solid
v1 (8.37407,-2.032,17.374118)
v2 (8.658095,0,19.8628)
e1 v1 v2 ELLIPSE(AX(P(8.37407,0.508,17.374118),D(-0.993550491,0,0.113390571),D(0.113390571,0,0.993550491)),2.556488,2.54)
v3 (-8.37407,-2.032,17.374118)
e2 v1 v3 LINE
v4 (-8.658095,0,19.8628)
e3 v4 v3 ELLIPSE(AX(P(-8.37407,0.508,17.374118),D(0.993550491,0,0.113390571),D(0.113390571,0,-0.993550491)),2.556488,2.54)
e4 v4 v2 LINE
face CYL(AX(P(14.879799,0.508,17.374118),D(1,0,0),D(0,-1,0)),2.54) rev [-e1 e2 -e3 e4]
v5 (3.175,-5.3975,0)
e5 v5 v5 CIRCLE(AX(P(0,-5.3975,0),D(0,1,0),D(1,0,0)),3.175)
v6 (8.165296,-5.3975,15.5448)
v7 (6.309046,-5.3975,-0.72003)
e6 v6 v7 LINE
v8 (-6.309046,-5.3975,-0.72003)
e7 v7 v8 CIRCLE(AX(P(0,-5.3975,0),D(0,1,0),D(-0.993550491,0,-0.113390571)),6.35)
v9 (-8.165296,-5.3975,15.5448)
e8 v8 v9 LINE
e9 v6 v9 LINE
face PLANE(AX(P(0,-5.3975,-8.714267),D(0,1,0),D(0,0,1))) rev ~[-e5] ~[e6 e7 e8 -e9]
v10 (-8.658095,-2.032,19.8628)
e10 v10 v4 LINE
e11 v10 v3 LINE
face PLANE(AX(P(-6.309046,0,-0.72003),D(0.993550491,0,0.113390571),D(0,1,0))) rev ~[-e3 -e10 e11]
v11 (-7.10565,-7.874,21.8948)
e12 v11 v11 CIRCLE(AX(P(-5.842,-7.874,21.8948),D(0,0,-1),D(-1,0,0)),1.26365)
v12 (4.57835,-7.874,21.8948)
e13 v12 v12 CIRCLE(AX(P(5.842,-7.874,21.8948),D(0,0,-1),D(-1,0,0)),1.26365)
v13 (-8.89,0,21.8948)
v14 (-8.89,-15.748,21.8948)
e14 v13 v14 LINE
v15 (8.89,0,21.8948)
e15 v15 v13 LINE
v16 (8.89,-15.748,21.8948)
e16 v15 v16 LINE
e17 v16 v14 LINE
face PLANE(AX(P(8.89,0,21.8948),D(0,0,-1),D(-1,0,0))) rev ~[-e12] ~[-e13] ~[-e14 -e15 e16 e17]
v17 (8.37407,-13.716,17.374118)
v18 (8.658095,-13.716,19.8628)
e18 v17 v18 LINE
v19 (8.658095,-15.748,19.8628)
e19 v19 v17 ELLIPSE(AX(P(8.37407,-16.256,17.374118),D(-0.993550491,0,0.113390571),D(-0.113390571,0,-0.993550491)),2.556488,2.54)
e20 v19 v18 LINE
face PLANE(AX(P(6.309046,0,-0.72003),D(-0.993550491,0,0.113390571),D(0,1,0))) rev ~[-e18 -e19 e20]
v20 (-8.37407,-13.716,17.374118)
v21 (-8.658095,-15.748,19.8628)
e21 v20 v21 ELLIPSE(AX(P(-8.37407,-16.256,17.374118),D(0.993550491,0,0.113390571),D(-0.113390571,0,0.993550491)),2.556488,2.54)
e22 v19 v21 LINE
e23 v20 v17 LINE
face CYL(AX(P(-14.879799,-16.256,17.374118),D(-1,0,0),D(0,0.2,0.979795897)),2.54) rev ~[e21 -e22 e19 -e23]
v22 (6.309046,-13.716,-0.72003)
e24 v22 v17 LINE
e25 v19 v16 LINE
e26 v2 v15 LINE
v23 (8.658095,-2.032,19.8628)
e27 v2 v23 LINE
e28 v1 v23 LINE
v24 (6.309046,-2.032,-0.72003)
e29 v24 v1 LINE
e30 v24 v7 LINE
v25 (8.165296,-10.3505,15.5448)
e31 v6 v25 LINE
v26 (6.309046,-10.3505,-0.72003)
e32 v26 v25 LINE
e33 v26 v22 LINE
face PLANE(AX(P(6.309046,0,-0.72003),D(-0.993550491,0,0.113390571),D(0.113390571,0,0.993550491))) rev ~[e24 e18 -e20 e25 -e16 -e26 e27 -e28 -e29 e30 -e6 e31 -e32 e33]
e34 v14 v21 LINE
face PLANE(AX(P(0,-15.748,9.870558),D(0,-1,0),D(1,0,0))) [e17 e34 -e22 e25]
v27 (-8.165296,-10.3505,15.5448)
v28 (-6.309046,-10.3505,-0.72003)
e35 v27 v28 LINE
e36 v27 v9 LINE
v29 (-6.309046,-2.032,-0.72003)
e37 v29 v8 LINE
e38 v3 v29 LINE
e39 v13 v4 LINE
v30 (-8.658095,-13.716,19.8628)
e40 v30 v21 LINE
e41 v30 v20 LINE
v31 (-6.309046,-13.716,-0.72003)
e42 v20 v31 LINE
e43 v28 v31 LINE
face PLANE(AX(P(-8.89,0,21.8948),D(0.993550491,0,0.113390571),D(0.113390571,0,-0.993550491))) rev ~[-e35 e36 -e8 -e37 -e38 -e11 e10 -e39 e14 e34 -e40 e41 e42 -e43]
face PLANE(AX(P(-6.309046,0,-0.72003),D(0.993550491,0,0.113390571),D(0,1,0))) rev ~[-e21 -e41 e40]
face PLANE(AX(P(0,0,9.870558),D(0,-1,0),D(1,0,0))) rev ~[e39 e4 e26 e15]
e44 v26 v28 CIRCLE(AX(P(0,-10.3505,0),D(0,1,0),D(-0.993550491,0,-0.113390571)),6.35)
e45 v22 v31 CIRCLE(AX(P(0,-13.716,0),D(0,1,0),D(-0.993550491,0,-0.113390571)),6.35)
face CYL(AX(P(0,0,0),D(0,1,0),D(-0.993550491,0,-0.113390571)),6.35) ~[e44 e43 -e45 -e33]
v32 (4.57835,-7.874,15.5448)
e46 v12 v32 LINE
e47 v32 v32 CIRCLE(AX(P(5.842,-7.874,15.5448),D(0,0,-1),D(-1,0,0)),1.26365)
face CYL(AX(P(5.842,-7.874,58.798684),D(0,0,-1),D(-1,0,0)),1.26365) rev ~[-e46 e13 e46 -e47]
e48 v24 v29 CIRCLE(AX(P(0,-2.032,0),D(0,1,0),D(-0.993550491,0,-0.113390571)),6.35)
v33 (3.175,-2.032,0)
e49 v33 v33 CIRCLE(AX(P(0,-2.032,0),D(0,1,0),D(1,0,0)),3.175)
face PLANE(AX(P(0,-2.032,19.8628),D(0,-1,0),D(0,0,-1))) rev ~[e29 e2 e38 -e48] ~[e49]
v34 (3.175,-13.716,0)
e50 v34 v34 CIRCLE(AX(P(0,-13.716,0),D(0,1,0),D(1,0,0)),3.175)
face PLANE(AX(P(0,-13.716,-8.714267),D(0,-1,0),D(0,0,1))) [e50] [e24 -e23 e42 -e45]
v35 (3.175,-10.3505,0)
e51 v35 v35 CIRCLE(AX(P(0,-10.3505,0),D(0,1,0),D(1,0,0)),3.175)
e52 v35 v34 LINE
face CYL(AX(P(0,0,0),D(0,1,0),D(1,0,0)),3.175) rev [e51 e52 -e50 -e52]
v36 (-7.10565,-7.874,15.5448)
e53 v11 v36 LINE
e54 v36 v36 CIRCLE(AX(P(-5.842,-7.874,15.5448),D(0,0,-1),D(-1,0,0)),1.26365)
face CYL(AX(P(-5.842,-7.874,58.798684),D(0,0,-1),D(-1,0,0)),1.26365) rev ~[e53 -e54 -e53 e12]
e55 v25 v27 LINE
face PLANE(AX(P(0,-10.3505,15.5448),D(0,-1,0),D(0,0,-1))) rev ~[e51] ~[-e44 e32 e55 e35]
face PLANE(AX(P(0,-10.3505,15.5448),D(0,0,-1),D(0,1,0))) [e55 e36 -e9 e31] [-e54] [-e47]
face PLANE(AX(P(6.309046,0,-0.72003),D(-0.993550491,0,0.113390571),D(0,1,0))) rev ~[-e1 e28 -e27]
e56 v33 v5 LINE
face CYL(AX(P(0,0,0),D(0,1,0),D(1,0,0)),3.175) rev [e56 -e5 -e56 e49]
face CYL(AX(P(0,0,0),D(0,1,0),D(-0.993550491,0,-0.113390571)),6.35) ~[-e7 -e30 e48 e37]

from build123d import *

# Parameters (mm, degrees)
F0_R         = 3.175
F1_DEPTH     = 15.748
F2_W         = 4.953
F2_H         = 16.2648302115
F2_H_2       = 7.994236929
F3_DEPTH     = 12.7
F2_W_2       = 2.032
F2_H_3       = 20.5828301237
F4_DEPTH     = 12.7
F5_T4_DEPTH  = 29.7595972634
F5_T10_DEPTH = 29.7595972634
F7_D         = 2.5273


# Not quite as in the source:
# - a fillet or chamfer that OpenCascade refuses, or shapes differently, is made with other operations: its cross-section is extruded or revolved along the edge and cut away or added


with BuildPart() as f1:
    # F0 (on Front) → F1 (new body)
    with BuildSketch(Plane.XZ):
        with BuildLine():
            Line((-8.89, 21.8948), (-6.3090456189, -0.7200301237))
            ThreePointArc((-6.3090456189, -0.7200301237), (0, -6.35), (6.3090456189, -0.7200301237))
            Line((6.3090456189, -0.7200301237), (8.89, 21.8948))
            Line((8.89, 21.8948), (-8.89, 21.8948))
        make_face()
        Circle(F0_R, mode=Mode.SUBTRACT)
    extrude(amount=F1_DEPTH)

    # F2 (on Right) → F3 (cut, symmetric)
    with BuildSketch(Plane.YZ):
        with Locations((-7.874, 7.4123849821)):
            Rectangle(F2_W, F2_H)
        with Locations((-7.874, -4.7171485882)):
            Rectangle(F2_W, F2_H_2)
    extrude(amount=F3_DEPTH, both=True, mode=Mode.SUBTRACT)

    # F2 (on Right) → F4 (cut, symmetric)
    with BuildSketch(Plane.YZ):
        with Locations((-14.732, -4.7171485882)):
            Rectangle(F2_W_2, F2_H_2)
        with Locations((-1.016, -4.7171485882)):
            Rectangle(F2_W_2, F2_H_2)
        with Locations((-1.016, 9.5713849382)):
            Rectangle(F2_W_2, F2_H_3)
        with Locations((-14.732, 9.5713849382)):
            Rectangle(F2_W_2, F2_H_3)
    extrude(amount=F4_DEPTH, both=True, mode=Mode.SUBTRACT)

    # F5: fillet of radius 2.54 on 2 edges, made by hand


with BuildPart() as f5_tool2:
    # F5_s3 → F5_t4 (new body)
    with BuildSketch(Plane.YZ.offset(-14.8797986317)):
        with BuildLine():
            ThreePointArc((-15.748, 19.8628), (-14.2885244601, 18.9805554727), (-13.716, 17.3741184213))
            Line((-13.716, 17.3741184213), (-13.716, 19.8628))
            Line((-13.716, 19.8628), (-15.748, 19.8628))
        make_face()
    extrude(amount=F5_T4_DEPTH)

    split(bisect_by=Plane(origin=(6.3090456189, 0, -0.7200301237), x_dir=(0, 1, 0), z_dir=(-0.9935504912, 0, 0.1133905707)), keep=Keep.TOP)

    split(bisect_by=Plane(origin=(-6.3090456189, 0, -0.7200301237), x_dir=(0, 1, 0), z_dir=(0.9935504912, 0, 0.1133905707)), keep=Keep.TOP)


with BuildPart() as f1_1:
    add(f1.part)

    # F5_t1: union F5_tool2
    add(f5_tool2.part)


with BuildPart() as f5_tool8:
    # F5_s9 → F5_t10 (new body)
    with BuildSketch(Plane.YZ.offset(14.8797986317)):
        with BuildLine():
            ThreePointArc((-2.032, 17.3741184213), (-1.4594755399, 18.9805554727), (0, 19.8628))
            Line((0, 19.8628), (-2.032, 19.8628))
            Line((-2.032, 19.8628), (-2.032, 17.3741184213))
        make_face()
    extrude(amount=-F5_T10_DEPTH)

    split(bisect_by=Plane(origin=(6.3090456189, 0, -0.7200301237), x_dir=(0, 1, 0), z_dir=(-0.9935504912, 0, 0.1133905707)), keep=Keep.TOP)

    split(bisect_by=Plane(origin=(-6.3090456189, 0, -0.7200301237), x_dir=(0, 1, 0), z_dir=(0.9935504912, 0, 0.1133905707)), keep=Keep.TOP)


with BuildPart() as f1_2:
    add(f1_1.part)

    # F5_t7: union F5_tool8
    add(f5_tool8.part)

    # F7 (through all)
    with Locations(Plane.XY.offset(21.8948)):
        with Locations((-5.842, -7.874), (5.842, -7.874)):
            Hole(F7_D / 2)


solid = f1_2.part
